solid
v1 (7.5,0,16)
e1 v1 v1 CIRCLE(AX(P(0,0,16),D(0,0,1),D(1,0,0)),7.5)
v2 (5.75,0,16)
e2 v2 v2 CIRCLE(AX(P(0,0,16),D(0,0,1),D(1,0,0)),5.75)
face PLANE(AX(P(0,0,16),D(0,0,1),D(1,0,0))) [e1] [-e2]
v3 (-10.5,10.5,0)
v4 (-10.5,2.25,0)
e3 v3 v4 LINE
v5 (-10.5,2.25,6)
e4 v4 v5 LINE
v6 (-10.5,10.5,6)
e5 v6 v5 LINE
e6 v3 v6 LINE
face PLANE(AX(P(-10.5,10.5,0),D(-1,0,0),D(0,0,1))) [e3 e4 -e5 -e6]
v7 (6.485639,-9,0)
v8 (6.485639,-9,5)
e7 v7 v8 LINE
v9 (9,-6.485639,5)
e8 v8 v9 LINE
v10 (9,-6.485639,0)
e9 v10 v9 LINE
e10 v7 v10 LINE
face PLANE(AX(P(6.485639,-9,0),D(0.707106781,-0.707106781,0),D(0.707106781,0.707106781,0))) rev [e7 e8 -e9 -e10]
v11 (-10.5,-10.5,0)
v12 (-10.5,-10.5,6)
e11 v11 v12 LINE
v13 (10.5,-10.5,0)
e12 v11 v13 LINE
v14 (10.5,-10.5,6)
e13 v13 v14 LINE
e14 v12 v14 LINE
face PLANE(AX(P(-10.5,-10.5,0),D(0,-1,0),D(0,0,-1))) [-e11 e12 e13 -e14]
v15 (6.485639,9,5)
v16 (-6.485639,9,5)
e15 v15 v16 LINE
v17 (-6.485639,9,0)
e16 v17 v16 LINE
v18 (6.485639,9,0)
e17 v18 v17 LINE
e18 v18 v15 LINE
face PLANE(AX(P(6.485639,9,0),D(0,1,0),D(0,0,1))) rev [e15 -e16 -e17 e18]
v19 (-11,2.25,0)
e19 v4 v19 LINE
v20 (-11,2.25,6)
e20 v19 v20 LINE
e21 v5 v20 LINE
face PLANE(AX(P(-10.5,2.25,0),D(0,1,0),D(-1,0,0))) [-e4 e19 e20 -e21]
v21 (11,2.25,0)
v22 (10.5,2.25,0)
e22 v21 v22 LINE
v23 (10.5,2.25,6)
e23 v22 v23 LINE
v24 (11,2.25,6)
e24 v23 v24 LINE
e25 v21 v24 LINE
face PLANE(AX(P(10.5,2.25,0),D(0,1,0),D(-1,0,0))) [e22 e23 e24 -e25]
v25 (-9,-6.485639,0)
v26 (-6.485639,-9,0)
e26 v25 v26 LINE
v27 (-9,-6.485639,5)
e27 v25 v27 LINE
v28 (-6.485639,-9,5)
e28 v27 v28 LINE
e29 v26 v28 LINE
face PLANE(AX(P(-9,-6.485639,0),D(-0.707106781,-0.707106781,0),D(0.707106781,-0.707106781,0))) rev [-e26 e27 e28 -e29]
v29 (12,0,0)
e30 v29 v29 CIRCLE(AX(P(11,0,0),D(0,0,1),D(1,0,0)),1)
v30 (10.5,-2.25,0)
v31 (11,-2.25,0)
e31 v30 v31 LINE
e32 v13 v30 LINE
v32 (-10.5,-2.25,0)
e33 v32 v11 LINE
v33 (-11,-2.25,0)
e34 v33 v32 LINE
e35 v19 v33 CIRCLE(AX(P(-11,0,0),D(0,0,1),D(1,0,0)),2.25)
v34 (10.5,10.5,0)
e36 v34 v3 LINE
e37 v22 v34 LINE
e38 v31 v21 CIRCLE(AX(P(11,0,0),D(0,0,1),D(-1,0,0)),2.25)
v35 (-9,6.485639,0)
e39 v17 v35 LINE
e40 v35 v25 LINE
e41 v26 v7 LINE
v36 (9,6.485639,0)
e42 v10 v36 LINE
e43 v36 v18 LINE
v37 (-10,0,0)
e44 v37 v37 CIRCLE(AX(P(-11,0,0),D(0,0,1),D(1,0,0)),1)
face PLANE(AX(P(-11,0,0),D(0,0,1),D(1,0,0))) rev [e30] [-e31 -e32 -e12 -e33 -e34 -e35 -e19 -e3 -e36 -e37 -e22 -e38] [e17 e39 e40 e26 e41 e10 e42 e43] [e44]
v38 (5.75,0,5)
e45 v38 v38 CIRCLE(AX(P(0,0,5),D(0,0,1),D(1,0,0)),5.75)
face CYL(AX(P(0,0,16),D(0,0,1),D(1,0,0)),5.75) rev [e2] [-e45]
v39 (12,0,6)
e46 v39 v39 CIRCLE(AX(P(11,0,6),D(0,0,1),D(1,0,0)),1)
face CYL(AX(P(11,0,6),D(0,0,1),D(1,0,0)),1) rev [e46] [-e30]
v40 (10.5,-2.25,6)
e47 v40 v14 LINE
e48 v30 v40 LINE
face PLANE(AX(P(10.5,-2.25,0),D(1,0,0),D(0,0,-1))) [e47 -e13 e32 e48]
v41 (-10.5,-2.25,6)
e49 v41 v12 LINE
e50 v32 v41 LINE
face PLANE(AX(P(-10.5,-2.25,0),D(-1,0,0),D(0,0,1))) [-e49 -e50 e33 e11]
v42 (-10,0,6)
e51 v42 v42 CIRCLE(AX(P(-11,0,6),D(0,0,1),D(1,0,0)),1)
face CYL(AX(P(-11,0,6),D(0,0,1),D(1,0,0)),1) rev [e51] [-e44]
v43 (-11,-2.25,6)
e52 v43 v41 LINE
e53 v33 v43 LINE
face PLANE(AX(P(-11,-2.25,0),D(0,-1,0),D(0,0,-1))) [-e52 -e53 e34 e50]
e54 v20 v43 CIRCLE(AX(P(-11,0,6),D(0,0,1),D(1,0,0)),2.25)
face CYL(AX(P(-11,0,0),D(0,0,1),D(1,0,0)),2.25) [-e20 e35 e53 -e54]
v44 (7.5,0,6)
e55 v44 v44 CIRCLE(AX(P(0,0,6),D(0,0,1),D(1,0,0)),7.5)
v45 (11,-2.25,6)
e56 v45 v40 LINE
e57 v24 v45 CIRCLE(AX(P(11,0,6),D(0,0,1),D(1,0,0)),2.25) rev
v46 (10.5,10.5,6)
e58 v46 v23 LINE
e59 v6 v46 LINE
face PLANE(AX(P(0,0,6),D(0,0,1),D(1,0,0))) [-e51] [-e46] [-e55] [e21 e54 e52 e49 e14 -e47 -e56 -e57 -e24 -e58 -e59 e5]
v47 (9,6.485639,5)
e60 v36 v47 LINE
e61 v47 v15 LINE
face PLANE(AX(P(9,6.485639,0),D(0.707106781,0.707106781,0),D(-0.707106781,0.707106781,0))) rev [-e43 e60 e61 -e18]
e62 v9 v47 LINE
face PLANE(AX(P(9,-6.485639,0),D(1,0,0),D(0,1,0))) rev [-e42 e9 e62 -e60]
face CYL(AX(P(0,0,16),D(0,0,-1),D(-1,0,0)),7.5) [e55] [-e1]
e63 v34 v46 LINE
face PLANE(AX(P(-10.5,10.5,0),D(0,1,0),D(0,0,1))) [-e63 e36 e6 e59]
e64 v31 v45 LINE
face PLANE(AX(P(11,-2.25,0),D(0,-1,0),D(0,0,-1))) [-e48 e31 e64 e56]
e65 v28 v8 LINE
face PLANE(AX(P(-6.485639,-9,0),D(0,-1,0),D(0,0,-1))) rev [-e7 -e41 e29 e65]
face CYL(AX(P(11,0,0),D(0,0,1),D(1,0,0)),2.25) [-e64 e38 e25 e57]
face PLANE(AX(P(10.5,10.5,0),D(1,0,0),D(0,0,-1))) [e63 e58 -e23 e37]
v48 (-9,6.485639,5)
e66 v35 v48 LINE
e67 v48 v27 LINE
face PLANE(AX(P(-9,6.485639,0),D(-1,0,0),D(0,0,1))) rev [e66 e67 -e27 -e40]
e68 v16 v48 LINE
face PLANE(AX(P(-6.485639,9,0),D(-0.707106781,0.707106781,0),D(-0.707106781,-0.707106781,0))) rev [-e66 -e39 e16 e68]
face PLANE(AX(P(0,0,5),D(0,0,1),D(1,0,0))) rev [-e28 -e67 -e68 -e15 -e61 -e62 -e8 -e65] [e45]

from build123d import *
from build123d.topology import SkipClean

# Parameters (mm, degrees)
BASE_HULL_DEPTH                   = 5
BASE_START                        = 1
BASE_COVER_DEPTH                  = 1
LENS_HOLE_HULL_BASE_SKETCH_R      = 7.5
LENS_HOLE_HULL_DEPTH              = 10
LENS_HOLE_D                       = 11.5
MOUNT_HOLES_D                     = 2
PULL_START                        = -5
PULL_BASE_TO_ORIGIN_OUTLINE_R     = 1
PULL_BASE_TO_ORIGIN_DEPTH         = 5
PULL_BASE_TO_ORIGIN_2_OUTLINE_R   = 5.75
PULL_BASE_TO_ORIGIN_2_DEPTH       = 5
PULL_START_2                      = 1
PULL_BASE_TO_ORIGIN_3_OUTLINE_R   = 1
PULL_BASE_TO_ORIGIN_3_DEPTH       = 5
PULL_START_3                      = 11
PULL_BASE_TO_ORIGIN_4_OUTLINE_R   = 7.5
PULL_BASE_TO_ORIGIN_4_OUTLINE_R_2 = 5.75
PULL_BASE_TO_ORIGIN_4_DEPTH       = 5
PULL_START_4                      = 5
PULL_BASE_TO_ORIGIN_5_OUTLINE_R   = 7.5
PULL_BASE_TO_ORIGIN_5_DEPTH       = 1


# Read off the part's stored shape, not the designer's step: Pull base to origin
with BuildPart() as part:
    # Base sketch → Base hull (new body)
    with BuildSketch(Plane.XY):
        with BuildLine():
            Line((-10.5, 10.5), (10.5, 10.5))
            Line((10.5, 10.5), (10.5, 2.25))
            Line((10.5, 2.25), (11, 2.25))
            ThreePointArc((11, 2.25), (13.25, 0), (11, -2.25))
            Line((11, -2.25), (10.5, -2.25))
            Line((10.5, -2.25), (10.5, -10.5))
            Line((10.5, -10.5), (-10.5, -10.5))
            Line((-10.5, -10.5), (-10.5, -2.25))
            Line((-10.5, -2.25), (-11, -2.25))
            ThreePointArc((-11, -2.25), (-13.25, 0), (-11, 2.25))
            Line((-11, 2.25), (-10.5, 2.25))
            Line((-10.5, 2.25), (-10.5, 10.5))
        make_face()
        Polygon((-9, 6.485638508), (-9, -6.485638508), (-6.485638508, -9), (6.485638508, -9), (9, -6.485638508), (9, 6.485638508), (6.485638508, 9), (-6.485638508, 9), align=None, mode=Mode.SUBTRACT)
    extrude(amount=-BASE_HULL_DEPTH)

    # Base sketch<2> → Base cover (add)
    # profile 1 of 2: a face of its own
    with BuildSketch(Plane.XY.offset(BASE_START)):
        with BuildLine():
            ThreePointArc((11, 2.25), (13.25, 0), (11, -2.25))
            Line((11, -2.25), (10.5, -2.25))
            Line((10.5, -2.25), (10.5, -10.5))
            Line((10.5, -10.5), (-10.5, -10.5))
            Line((-10.5, -10.5), (-10.5, -2.25))
            Line((-10.5, -2.25), (-11, -2.25))
            ThreePointArc((-11, -2.25), (-13.25, 0), (-11, 2.25))
            Line((-11, 2.25), (-10.5, 2.25))
            Line((-10.5, 2.25), (-10.5, 10.5))
            Line((-10.5, 10.5), (10.5, 10.5))
            Line((10.5, 10.5), (10.5, 2.25))
            Line((10.5, 2.25), (11, 2.25))
        make_face()
        Polygon((-6.485638508, 9), (-9, 6.485638508), (-9, -6.485638508), (-6.485638508, -9), (6.485638508, -9), (9, -6.485638508), (9, 6.485638508), (6.485638508, 9), align=None, mode=Mode.SUBTRACT)
    # profile 2 of 2: a face of its own
    with BuildSketch(Plane.XY.offset(BASE_START)):
        Polygon((6.485638508, 9), (-6.485638508, 9), (-9, 6.485638508), (-9, -6.485638508), (-6.485638508, -9), (6.485638508, -9), (9, -6.485638508), (9, 6.485638508), align=None)
    extrude(amount=-BASE_COVER_DEPTH)

    # Lens hole hull base sketch → Lens hole hull (add)
    with BuildSketch(Plane.XY.offset(1)):
        Circle(LENS_HOLE_HULL_BASE_SKETCH_R)
    extrude(amount=LENS_HOLE_HULL_DEPTH)

    # Lens hole (through all)
    with Locations(Plane.XY.offset(11)):
        with Locations((0, 0)):
            Hole(LENS_HOLE_D / 2)

    # Mount holes (through all)
    with Locations(Plane.XY.offset(1)):
        with Locations((-11, 0), (11, 0)):
            Hole(MOUNT_HOLES_D / 2)

    # Pull base to origin outline → Pull base to origin (cut)
    with BuildSketch(Plane.XY.offset(PULL_START)):
        with BuildLine():
            Line((10.5, 10.5), (-10.5, 10.5))
            Line((-10.5, 10.5), (-10.5, 2.25))
            Line((-10.5, 2.25), (-11, 2.25))
            ThreePointArc((-11, 2.25), (-13.25, 0), (-11, -2.25))
            Line((-11, -2.25), (-10.5, -2.25))
            Line((-10.5, -2.25), (-10.5, -10.5))
            Line((-10.5, -10.5), (10.5, -10.5))
            Line((10.5, -10.5), (10.5, -2.25))
            Line((10.5, -2.25), (11, -2.25))
            ThreePointArc((11, -2.25), (13.25, 0), (11, 2.25))
            Line((11, 2.25), (10.5, 2.25))
            Line((10.5, 2.25), (10.5, 10.5))
        make_face()
        with Locations((-11, 0)):
            Circle(PULL_BASE_TO_ORIGIN_OUTLINE_R, mode=Mode.SUBTRACT)
        Polygon((6.485638508, -9), (-6.485638508, -9), (-9, -6.485638508), (-9, 6.485638508), (-6.485638508, 9), (6.485638508, 9), (9, 6.485638508), (9, -6.485638508), align=None, mode=Mode.SUBTRACT)
        with Locations((11, 0)):
            Circle(PULL_BASE_TO_ORIGIN_OUTLINE_R, mode=Mode.SUBTRACT)
    extrude(amount=PULL_BASE_TO_ORIGIN_DEPTH, mode=Mode.SUBTRACT)

    # Pull base to origin 2 outline → Pull base to origin 2 (cut)
    with BuildSketch(Plane.XY):
        Polygon((-9, -6.485638508), (-6.485638508, -9), (6.485638508, -9), (9, -6.485638508), (9, 6.485638508), (6.485638508, 9), (-6.485638508, 9), (-9, 6.485638508), align=None)
        Circle(PULL_BASE_TO_ORIGIN_2_OUTLINE_R, mode=Mode.SUBTRACT)
    extrude(amount=PULL_BASE_TO_ORIGIN_2_DEPTH, mode=Mode.SUBTRACT)

    # Pull base to origin 3 outline → Pull base to origin 3 (add)
    with SkipClean():  # the faces are left unmerged after this step: merging them gives an invalid solid
        with BuildSketch(Plane.XY.offset(PULL_START_2)):
            with BuildLine():
                Line((10.5, 10.5), (-10.5, 10.5))
                Line((-10.5, 10.5), (-10.5, 2.25))
                Line((-10.5, 2.25), (-11, 2.25))
                ThreePointArc((-11, 2.25), (-13.25, 0), (-11, -2.25))
                Line((-11, -2.25), (-10.5, -2.25))
                Line((-10.5, -2.25), (-10.5, -10.5))
                Line((-10.5, -10.5), (10.5, -10.5))
                Line((10.5, -10.5), (10.5, -2.25))
                Line((10.5, -2.25), (11, -2.25))
                ThreePointArc((11, -2.25), (13.25, 0), (11, 2.25))
                Line((11, 2.25), (10.5, 2.25))
                Line((10.5, 2.25), (10.5, 10.5))
            make_face()
            with Locations((-11, 0)):
                Circle(PULL_BASE_TO_ORIGIN_3_OUTLINE_R, mode=Mode.SUBTRACT)
            Polygon((6.485638508, -9), (-6.485638508, -9), (-9, -6.485638508), (-9, 6.485638508), (-6.485638508, 9), (6.485638508, 9), (9, 6.485638508), (9, -6.485638508), align=None, mode=Mode.SUBTRACT)
            with Locations((11, 0)):
                Circle(PULL_BASE_TO_ORIGIN_3_OUTLINE_R, mode=Mode.SUBTRACT)
        extrude(amount=PULL_BASE_TO_ORIGIN_3_DEPTH)
    add(part.part.scale(1), mode=Mode.REPLACE)  # the faces are merged on a copy

    # Pull base to origin 4 outline → Pull base to origin 4 (add)
    with SkipClean():  # the faces are left unmerged after this step: merging them gives an invalid solid
        with BuildSketch(Plane.XY.offset(PULL_START_3)):
            Circle(PULL_BASE_TO_ORIGIN_4_OUTLINE_R)
            Circle(PULL_BASE_TO_ORIGIN_4_OUTLINE_R_2, mode=Mode.SUBTRACT)
        extrude(amount=PULL_BASE_TO_ORIGIN_4_DEPTH)

    # Pull base to origin 5 outline → Pull base to origin 5 (add)
    with SkipClean():  # the faces are left unmerged after this step: merging them gives an invalid solid
        with BuildSketch(Plane.XY.offset(PULL_START_4)):
            Polygon((-9, -6.485638508), (-6.485638508, -9), (6.485638508, -9), (9, -6.485638508), (9, 6.485638508), (6.485638508, 9), (-6.485638508, 9), (-9, 6.485638508), align=None)
            Circle(PULL_BASE_TO_ORIGIN_5_OUTLINE_R, mode=Mode.SUBTRACT)
        extrude(amount=PULL_BASE_TO_ORIGIN_5_DEPTH)


solid = part.part
